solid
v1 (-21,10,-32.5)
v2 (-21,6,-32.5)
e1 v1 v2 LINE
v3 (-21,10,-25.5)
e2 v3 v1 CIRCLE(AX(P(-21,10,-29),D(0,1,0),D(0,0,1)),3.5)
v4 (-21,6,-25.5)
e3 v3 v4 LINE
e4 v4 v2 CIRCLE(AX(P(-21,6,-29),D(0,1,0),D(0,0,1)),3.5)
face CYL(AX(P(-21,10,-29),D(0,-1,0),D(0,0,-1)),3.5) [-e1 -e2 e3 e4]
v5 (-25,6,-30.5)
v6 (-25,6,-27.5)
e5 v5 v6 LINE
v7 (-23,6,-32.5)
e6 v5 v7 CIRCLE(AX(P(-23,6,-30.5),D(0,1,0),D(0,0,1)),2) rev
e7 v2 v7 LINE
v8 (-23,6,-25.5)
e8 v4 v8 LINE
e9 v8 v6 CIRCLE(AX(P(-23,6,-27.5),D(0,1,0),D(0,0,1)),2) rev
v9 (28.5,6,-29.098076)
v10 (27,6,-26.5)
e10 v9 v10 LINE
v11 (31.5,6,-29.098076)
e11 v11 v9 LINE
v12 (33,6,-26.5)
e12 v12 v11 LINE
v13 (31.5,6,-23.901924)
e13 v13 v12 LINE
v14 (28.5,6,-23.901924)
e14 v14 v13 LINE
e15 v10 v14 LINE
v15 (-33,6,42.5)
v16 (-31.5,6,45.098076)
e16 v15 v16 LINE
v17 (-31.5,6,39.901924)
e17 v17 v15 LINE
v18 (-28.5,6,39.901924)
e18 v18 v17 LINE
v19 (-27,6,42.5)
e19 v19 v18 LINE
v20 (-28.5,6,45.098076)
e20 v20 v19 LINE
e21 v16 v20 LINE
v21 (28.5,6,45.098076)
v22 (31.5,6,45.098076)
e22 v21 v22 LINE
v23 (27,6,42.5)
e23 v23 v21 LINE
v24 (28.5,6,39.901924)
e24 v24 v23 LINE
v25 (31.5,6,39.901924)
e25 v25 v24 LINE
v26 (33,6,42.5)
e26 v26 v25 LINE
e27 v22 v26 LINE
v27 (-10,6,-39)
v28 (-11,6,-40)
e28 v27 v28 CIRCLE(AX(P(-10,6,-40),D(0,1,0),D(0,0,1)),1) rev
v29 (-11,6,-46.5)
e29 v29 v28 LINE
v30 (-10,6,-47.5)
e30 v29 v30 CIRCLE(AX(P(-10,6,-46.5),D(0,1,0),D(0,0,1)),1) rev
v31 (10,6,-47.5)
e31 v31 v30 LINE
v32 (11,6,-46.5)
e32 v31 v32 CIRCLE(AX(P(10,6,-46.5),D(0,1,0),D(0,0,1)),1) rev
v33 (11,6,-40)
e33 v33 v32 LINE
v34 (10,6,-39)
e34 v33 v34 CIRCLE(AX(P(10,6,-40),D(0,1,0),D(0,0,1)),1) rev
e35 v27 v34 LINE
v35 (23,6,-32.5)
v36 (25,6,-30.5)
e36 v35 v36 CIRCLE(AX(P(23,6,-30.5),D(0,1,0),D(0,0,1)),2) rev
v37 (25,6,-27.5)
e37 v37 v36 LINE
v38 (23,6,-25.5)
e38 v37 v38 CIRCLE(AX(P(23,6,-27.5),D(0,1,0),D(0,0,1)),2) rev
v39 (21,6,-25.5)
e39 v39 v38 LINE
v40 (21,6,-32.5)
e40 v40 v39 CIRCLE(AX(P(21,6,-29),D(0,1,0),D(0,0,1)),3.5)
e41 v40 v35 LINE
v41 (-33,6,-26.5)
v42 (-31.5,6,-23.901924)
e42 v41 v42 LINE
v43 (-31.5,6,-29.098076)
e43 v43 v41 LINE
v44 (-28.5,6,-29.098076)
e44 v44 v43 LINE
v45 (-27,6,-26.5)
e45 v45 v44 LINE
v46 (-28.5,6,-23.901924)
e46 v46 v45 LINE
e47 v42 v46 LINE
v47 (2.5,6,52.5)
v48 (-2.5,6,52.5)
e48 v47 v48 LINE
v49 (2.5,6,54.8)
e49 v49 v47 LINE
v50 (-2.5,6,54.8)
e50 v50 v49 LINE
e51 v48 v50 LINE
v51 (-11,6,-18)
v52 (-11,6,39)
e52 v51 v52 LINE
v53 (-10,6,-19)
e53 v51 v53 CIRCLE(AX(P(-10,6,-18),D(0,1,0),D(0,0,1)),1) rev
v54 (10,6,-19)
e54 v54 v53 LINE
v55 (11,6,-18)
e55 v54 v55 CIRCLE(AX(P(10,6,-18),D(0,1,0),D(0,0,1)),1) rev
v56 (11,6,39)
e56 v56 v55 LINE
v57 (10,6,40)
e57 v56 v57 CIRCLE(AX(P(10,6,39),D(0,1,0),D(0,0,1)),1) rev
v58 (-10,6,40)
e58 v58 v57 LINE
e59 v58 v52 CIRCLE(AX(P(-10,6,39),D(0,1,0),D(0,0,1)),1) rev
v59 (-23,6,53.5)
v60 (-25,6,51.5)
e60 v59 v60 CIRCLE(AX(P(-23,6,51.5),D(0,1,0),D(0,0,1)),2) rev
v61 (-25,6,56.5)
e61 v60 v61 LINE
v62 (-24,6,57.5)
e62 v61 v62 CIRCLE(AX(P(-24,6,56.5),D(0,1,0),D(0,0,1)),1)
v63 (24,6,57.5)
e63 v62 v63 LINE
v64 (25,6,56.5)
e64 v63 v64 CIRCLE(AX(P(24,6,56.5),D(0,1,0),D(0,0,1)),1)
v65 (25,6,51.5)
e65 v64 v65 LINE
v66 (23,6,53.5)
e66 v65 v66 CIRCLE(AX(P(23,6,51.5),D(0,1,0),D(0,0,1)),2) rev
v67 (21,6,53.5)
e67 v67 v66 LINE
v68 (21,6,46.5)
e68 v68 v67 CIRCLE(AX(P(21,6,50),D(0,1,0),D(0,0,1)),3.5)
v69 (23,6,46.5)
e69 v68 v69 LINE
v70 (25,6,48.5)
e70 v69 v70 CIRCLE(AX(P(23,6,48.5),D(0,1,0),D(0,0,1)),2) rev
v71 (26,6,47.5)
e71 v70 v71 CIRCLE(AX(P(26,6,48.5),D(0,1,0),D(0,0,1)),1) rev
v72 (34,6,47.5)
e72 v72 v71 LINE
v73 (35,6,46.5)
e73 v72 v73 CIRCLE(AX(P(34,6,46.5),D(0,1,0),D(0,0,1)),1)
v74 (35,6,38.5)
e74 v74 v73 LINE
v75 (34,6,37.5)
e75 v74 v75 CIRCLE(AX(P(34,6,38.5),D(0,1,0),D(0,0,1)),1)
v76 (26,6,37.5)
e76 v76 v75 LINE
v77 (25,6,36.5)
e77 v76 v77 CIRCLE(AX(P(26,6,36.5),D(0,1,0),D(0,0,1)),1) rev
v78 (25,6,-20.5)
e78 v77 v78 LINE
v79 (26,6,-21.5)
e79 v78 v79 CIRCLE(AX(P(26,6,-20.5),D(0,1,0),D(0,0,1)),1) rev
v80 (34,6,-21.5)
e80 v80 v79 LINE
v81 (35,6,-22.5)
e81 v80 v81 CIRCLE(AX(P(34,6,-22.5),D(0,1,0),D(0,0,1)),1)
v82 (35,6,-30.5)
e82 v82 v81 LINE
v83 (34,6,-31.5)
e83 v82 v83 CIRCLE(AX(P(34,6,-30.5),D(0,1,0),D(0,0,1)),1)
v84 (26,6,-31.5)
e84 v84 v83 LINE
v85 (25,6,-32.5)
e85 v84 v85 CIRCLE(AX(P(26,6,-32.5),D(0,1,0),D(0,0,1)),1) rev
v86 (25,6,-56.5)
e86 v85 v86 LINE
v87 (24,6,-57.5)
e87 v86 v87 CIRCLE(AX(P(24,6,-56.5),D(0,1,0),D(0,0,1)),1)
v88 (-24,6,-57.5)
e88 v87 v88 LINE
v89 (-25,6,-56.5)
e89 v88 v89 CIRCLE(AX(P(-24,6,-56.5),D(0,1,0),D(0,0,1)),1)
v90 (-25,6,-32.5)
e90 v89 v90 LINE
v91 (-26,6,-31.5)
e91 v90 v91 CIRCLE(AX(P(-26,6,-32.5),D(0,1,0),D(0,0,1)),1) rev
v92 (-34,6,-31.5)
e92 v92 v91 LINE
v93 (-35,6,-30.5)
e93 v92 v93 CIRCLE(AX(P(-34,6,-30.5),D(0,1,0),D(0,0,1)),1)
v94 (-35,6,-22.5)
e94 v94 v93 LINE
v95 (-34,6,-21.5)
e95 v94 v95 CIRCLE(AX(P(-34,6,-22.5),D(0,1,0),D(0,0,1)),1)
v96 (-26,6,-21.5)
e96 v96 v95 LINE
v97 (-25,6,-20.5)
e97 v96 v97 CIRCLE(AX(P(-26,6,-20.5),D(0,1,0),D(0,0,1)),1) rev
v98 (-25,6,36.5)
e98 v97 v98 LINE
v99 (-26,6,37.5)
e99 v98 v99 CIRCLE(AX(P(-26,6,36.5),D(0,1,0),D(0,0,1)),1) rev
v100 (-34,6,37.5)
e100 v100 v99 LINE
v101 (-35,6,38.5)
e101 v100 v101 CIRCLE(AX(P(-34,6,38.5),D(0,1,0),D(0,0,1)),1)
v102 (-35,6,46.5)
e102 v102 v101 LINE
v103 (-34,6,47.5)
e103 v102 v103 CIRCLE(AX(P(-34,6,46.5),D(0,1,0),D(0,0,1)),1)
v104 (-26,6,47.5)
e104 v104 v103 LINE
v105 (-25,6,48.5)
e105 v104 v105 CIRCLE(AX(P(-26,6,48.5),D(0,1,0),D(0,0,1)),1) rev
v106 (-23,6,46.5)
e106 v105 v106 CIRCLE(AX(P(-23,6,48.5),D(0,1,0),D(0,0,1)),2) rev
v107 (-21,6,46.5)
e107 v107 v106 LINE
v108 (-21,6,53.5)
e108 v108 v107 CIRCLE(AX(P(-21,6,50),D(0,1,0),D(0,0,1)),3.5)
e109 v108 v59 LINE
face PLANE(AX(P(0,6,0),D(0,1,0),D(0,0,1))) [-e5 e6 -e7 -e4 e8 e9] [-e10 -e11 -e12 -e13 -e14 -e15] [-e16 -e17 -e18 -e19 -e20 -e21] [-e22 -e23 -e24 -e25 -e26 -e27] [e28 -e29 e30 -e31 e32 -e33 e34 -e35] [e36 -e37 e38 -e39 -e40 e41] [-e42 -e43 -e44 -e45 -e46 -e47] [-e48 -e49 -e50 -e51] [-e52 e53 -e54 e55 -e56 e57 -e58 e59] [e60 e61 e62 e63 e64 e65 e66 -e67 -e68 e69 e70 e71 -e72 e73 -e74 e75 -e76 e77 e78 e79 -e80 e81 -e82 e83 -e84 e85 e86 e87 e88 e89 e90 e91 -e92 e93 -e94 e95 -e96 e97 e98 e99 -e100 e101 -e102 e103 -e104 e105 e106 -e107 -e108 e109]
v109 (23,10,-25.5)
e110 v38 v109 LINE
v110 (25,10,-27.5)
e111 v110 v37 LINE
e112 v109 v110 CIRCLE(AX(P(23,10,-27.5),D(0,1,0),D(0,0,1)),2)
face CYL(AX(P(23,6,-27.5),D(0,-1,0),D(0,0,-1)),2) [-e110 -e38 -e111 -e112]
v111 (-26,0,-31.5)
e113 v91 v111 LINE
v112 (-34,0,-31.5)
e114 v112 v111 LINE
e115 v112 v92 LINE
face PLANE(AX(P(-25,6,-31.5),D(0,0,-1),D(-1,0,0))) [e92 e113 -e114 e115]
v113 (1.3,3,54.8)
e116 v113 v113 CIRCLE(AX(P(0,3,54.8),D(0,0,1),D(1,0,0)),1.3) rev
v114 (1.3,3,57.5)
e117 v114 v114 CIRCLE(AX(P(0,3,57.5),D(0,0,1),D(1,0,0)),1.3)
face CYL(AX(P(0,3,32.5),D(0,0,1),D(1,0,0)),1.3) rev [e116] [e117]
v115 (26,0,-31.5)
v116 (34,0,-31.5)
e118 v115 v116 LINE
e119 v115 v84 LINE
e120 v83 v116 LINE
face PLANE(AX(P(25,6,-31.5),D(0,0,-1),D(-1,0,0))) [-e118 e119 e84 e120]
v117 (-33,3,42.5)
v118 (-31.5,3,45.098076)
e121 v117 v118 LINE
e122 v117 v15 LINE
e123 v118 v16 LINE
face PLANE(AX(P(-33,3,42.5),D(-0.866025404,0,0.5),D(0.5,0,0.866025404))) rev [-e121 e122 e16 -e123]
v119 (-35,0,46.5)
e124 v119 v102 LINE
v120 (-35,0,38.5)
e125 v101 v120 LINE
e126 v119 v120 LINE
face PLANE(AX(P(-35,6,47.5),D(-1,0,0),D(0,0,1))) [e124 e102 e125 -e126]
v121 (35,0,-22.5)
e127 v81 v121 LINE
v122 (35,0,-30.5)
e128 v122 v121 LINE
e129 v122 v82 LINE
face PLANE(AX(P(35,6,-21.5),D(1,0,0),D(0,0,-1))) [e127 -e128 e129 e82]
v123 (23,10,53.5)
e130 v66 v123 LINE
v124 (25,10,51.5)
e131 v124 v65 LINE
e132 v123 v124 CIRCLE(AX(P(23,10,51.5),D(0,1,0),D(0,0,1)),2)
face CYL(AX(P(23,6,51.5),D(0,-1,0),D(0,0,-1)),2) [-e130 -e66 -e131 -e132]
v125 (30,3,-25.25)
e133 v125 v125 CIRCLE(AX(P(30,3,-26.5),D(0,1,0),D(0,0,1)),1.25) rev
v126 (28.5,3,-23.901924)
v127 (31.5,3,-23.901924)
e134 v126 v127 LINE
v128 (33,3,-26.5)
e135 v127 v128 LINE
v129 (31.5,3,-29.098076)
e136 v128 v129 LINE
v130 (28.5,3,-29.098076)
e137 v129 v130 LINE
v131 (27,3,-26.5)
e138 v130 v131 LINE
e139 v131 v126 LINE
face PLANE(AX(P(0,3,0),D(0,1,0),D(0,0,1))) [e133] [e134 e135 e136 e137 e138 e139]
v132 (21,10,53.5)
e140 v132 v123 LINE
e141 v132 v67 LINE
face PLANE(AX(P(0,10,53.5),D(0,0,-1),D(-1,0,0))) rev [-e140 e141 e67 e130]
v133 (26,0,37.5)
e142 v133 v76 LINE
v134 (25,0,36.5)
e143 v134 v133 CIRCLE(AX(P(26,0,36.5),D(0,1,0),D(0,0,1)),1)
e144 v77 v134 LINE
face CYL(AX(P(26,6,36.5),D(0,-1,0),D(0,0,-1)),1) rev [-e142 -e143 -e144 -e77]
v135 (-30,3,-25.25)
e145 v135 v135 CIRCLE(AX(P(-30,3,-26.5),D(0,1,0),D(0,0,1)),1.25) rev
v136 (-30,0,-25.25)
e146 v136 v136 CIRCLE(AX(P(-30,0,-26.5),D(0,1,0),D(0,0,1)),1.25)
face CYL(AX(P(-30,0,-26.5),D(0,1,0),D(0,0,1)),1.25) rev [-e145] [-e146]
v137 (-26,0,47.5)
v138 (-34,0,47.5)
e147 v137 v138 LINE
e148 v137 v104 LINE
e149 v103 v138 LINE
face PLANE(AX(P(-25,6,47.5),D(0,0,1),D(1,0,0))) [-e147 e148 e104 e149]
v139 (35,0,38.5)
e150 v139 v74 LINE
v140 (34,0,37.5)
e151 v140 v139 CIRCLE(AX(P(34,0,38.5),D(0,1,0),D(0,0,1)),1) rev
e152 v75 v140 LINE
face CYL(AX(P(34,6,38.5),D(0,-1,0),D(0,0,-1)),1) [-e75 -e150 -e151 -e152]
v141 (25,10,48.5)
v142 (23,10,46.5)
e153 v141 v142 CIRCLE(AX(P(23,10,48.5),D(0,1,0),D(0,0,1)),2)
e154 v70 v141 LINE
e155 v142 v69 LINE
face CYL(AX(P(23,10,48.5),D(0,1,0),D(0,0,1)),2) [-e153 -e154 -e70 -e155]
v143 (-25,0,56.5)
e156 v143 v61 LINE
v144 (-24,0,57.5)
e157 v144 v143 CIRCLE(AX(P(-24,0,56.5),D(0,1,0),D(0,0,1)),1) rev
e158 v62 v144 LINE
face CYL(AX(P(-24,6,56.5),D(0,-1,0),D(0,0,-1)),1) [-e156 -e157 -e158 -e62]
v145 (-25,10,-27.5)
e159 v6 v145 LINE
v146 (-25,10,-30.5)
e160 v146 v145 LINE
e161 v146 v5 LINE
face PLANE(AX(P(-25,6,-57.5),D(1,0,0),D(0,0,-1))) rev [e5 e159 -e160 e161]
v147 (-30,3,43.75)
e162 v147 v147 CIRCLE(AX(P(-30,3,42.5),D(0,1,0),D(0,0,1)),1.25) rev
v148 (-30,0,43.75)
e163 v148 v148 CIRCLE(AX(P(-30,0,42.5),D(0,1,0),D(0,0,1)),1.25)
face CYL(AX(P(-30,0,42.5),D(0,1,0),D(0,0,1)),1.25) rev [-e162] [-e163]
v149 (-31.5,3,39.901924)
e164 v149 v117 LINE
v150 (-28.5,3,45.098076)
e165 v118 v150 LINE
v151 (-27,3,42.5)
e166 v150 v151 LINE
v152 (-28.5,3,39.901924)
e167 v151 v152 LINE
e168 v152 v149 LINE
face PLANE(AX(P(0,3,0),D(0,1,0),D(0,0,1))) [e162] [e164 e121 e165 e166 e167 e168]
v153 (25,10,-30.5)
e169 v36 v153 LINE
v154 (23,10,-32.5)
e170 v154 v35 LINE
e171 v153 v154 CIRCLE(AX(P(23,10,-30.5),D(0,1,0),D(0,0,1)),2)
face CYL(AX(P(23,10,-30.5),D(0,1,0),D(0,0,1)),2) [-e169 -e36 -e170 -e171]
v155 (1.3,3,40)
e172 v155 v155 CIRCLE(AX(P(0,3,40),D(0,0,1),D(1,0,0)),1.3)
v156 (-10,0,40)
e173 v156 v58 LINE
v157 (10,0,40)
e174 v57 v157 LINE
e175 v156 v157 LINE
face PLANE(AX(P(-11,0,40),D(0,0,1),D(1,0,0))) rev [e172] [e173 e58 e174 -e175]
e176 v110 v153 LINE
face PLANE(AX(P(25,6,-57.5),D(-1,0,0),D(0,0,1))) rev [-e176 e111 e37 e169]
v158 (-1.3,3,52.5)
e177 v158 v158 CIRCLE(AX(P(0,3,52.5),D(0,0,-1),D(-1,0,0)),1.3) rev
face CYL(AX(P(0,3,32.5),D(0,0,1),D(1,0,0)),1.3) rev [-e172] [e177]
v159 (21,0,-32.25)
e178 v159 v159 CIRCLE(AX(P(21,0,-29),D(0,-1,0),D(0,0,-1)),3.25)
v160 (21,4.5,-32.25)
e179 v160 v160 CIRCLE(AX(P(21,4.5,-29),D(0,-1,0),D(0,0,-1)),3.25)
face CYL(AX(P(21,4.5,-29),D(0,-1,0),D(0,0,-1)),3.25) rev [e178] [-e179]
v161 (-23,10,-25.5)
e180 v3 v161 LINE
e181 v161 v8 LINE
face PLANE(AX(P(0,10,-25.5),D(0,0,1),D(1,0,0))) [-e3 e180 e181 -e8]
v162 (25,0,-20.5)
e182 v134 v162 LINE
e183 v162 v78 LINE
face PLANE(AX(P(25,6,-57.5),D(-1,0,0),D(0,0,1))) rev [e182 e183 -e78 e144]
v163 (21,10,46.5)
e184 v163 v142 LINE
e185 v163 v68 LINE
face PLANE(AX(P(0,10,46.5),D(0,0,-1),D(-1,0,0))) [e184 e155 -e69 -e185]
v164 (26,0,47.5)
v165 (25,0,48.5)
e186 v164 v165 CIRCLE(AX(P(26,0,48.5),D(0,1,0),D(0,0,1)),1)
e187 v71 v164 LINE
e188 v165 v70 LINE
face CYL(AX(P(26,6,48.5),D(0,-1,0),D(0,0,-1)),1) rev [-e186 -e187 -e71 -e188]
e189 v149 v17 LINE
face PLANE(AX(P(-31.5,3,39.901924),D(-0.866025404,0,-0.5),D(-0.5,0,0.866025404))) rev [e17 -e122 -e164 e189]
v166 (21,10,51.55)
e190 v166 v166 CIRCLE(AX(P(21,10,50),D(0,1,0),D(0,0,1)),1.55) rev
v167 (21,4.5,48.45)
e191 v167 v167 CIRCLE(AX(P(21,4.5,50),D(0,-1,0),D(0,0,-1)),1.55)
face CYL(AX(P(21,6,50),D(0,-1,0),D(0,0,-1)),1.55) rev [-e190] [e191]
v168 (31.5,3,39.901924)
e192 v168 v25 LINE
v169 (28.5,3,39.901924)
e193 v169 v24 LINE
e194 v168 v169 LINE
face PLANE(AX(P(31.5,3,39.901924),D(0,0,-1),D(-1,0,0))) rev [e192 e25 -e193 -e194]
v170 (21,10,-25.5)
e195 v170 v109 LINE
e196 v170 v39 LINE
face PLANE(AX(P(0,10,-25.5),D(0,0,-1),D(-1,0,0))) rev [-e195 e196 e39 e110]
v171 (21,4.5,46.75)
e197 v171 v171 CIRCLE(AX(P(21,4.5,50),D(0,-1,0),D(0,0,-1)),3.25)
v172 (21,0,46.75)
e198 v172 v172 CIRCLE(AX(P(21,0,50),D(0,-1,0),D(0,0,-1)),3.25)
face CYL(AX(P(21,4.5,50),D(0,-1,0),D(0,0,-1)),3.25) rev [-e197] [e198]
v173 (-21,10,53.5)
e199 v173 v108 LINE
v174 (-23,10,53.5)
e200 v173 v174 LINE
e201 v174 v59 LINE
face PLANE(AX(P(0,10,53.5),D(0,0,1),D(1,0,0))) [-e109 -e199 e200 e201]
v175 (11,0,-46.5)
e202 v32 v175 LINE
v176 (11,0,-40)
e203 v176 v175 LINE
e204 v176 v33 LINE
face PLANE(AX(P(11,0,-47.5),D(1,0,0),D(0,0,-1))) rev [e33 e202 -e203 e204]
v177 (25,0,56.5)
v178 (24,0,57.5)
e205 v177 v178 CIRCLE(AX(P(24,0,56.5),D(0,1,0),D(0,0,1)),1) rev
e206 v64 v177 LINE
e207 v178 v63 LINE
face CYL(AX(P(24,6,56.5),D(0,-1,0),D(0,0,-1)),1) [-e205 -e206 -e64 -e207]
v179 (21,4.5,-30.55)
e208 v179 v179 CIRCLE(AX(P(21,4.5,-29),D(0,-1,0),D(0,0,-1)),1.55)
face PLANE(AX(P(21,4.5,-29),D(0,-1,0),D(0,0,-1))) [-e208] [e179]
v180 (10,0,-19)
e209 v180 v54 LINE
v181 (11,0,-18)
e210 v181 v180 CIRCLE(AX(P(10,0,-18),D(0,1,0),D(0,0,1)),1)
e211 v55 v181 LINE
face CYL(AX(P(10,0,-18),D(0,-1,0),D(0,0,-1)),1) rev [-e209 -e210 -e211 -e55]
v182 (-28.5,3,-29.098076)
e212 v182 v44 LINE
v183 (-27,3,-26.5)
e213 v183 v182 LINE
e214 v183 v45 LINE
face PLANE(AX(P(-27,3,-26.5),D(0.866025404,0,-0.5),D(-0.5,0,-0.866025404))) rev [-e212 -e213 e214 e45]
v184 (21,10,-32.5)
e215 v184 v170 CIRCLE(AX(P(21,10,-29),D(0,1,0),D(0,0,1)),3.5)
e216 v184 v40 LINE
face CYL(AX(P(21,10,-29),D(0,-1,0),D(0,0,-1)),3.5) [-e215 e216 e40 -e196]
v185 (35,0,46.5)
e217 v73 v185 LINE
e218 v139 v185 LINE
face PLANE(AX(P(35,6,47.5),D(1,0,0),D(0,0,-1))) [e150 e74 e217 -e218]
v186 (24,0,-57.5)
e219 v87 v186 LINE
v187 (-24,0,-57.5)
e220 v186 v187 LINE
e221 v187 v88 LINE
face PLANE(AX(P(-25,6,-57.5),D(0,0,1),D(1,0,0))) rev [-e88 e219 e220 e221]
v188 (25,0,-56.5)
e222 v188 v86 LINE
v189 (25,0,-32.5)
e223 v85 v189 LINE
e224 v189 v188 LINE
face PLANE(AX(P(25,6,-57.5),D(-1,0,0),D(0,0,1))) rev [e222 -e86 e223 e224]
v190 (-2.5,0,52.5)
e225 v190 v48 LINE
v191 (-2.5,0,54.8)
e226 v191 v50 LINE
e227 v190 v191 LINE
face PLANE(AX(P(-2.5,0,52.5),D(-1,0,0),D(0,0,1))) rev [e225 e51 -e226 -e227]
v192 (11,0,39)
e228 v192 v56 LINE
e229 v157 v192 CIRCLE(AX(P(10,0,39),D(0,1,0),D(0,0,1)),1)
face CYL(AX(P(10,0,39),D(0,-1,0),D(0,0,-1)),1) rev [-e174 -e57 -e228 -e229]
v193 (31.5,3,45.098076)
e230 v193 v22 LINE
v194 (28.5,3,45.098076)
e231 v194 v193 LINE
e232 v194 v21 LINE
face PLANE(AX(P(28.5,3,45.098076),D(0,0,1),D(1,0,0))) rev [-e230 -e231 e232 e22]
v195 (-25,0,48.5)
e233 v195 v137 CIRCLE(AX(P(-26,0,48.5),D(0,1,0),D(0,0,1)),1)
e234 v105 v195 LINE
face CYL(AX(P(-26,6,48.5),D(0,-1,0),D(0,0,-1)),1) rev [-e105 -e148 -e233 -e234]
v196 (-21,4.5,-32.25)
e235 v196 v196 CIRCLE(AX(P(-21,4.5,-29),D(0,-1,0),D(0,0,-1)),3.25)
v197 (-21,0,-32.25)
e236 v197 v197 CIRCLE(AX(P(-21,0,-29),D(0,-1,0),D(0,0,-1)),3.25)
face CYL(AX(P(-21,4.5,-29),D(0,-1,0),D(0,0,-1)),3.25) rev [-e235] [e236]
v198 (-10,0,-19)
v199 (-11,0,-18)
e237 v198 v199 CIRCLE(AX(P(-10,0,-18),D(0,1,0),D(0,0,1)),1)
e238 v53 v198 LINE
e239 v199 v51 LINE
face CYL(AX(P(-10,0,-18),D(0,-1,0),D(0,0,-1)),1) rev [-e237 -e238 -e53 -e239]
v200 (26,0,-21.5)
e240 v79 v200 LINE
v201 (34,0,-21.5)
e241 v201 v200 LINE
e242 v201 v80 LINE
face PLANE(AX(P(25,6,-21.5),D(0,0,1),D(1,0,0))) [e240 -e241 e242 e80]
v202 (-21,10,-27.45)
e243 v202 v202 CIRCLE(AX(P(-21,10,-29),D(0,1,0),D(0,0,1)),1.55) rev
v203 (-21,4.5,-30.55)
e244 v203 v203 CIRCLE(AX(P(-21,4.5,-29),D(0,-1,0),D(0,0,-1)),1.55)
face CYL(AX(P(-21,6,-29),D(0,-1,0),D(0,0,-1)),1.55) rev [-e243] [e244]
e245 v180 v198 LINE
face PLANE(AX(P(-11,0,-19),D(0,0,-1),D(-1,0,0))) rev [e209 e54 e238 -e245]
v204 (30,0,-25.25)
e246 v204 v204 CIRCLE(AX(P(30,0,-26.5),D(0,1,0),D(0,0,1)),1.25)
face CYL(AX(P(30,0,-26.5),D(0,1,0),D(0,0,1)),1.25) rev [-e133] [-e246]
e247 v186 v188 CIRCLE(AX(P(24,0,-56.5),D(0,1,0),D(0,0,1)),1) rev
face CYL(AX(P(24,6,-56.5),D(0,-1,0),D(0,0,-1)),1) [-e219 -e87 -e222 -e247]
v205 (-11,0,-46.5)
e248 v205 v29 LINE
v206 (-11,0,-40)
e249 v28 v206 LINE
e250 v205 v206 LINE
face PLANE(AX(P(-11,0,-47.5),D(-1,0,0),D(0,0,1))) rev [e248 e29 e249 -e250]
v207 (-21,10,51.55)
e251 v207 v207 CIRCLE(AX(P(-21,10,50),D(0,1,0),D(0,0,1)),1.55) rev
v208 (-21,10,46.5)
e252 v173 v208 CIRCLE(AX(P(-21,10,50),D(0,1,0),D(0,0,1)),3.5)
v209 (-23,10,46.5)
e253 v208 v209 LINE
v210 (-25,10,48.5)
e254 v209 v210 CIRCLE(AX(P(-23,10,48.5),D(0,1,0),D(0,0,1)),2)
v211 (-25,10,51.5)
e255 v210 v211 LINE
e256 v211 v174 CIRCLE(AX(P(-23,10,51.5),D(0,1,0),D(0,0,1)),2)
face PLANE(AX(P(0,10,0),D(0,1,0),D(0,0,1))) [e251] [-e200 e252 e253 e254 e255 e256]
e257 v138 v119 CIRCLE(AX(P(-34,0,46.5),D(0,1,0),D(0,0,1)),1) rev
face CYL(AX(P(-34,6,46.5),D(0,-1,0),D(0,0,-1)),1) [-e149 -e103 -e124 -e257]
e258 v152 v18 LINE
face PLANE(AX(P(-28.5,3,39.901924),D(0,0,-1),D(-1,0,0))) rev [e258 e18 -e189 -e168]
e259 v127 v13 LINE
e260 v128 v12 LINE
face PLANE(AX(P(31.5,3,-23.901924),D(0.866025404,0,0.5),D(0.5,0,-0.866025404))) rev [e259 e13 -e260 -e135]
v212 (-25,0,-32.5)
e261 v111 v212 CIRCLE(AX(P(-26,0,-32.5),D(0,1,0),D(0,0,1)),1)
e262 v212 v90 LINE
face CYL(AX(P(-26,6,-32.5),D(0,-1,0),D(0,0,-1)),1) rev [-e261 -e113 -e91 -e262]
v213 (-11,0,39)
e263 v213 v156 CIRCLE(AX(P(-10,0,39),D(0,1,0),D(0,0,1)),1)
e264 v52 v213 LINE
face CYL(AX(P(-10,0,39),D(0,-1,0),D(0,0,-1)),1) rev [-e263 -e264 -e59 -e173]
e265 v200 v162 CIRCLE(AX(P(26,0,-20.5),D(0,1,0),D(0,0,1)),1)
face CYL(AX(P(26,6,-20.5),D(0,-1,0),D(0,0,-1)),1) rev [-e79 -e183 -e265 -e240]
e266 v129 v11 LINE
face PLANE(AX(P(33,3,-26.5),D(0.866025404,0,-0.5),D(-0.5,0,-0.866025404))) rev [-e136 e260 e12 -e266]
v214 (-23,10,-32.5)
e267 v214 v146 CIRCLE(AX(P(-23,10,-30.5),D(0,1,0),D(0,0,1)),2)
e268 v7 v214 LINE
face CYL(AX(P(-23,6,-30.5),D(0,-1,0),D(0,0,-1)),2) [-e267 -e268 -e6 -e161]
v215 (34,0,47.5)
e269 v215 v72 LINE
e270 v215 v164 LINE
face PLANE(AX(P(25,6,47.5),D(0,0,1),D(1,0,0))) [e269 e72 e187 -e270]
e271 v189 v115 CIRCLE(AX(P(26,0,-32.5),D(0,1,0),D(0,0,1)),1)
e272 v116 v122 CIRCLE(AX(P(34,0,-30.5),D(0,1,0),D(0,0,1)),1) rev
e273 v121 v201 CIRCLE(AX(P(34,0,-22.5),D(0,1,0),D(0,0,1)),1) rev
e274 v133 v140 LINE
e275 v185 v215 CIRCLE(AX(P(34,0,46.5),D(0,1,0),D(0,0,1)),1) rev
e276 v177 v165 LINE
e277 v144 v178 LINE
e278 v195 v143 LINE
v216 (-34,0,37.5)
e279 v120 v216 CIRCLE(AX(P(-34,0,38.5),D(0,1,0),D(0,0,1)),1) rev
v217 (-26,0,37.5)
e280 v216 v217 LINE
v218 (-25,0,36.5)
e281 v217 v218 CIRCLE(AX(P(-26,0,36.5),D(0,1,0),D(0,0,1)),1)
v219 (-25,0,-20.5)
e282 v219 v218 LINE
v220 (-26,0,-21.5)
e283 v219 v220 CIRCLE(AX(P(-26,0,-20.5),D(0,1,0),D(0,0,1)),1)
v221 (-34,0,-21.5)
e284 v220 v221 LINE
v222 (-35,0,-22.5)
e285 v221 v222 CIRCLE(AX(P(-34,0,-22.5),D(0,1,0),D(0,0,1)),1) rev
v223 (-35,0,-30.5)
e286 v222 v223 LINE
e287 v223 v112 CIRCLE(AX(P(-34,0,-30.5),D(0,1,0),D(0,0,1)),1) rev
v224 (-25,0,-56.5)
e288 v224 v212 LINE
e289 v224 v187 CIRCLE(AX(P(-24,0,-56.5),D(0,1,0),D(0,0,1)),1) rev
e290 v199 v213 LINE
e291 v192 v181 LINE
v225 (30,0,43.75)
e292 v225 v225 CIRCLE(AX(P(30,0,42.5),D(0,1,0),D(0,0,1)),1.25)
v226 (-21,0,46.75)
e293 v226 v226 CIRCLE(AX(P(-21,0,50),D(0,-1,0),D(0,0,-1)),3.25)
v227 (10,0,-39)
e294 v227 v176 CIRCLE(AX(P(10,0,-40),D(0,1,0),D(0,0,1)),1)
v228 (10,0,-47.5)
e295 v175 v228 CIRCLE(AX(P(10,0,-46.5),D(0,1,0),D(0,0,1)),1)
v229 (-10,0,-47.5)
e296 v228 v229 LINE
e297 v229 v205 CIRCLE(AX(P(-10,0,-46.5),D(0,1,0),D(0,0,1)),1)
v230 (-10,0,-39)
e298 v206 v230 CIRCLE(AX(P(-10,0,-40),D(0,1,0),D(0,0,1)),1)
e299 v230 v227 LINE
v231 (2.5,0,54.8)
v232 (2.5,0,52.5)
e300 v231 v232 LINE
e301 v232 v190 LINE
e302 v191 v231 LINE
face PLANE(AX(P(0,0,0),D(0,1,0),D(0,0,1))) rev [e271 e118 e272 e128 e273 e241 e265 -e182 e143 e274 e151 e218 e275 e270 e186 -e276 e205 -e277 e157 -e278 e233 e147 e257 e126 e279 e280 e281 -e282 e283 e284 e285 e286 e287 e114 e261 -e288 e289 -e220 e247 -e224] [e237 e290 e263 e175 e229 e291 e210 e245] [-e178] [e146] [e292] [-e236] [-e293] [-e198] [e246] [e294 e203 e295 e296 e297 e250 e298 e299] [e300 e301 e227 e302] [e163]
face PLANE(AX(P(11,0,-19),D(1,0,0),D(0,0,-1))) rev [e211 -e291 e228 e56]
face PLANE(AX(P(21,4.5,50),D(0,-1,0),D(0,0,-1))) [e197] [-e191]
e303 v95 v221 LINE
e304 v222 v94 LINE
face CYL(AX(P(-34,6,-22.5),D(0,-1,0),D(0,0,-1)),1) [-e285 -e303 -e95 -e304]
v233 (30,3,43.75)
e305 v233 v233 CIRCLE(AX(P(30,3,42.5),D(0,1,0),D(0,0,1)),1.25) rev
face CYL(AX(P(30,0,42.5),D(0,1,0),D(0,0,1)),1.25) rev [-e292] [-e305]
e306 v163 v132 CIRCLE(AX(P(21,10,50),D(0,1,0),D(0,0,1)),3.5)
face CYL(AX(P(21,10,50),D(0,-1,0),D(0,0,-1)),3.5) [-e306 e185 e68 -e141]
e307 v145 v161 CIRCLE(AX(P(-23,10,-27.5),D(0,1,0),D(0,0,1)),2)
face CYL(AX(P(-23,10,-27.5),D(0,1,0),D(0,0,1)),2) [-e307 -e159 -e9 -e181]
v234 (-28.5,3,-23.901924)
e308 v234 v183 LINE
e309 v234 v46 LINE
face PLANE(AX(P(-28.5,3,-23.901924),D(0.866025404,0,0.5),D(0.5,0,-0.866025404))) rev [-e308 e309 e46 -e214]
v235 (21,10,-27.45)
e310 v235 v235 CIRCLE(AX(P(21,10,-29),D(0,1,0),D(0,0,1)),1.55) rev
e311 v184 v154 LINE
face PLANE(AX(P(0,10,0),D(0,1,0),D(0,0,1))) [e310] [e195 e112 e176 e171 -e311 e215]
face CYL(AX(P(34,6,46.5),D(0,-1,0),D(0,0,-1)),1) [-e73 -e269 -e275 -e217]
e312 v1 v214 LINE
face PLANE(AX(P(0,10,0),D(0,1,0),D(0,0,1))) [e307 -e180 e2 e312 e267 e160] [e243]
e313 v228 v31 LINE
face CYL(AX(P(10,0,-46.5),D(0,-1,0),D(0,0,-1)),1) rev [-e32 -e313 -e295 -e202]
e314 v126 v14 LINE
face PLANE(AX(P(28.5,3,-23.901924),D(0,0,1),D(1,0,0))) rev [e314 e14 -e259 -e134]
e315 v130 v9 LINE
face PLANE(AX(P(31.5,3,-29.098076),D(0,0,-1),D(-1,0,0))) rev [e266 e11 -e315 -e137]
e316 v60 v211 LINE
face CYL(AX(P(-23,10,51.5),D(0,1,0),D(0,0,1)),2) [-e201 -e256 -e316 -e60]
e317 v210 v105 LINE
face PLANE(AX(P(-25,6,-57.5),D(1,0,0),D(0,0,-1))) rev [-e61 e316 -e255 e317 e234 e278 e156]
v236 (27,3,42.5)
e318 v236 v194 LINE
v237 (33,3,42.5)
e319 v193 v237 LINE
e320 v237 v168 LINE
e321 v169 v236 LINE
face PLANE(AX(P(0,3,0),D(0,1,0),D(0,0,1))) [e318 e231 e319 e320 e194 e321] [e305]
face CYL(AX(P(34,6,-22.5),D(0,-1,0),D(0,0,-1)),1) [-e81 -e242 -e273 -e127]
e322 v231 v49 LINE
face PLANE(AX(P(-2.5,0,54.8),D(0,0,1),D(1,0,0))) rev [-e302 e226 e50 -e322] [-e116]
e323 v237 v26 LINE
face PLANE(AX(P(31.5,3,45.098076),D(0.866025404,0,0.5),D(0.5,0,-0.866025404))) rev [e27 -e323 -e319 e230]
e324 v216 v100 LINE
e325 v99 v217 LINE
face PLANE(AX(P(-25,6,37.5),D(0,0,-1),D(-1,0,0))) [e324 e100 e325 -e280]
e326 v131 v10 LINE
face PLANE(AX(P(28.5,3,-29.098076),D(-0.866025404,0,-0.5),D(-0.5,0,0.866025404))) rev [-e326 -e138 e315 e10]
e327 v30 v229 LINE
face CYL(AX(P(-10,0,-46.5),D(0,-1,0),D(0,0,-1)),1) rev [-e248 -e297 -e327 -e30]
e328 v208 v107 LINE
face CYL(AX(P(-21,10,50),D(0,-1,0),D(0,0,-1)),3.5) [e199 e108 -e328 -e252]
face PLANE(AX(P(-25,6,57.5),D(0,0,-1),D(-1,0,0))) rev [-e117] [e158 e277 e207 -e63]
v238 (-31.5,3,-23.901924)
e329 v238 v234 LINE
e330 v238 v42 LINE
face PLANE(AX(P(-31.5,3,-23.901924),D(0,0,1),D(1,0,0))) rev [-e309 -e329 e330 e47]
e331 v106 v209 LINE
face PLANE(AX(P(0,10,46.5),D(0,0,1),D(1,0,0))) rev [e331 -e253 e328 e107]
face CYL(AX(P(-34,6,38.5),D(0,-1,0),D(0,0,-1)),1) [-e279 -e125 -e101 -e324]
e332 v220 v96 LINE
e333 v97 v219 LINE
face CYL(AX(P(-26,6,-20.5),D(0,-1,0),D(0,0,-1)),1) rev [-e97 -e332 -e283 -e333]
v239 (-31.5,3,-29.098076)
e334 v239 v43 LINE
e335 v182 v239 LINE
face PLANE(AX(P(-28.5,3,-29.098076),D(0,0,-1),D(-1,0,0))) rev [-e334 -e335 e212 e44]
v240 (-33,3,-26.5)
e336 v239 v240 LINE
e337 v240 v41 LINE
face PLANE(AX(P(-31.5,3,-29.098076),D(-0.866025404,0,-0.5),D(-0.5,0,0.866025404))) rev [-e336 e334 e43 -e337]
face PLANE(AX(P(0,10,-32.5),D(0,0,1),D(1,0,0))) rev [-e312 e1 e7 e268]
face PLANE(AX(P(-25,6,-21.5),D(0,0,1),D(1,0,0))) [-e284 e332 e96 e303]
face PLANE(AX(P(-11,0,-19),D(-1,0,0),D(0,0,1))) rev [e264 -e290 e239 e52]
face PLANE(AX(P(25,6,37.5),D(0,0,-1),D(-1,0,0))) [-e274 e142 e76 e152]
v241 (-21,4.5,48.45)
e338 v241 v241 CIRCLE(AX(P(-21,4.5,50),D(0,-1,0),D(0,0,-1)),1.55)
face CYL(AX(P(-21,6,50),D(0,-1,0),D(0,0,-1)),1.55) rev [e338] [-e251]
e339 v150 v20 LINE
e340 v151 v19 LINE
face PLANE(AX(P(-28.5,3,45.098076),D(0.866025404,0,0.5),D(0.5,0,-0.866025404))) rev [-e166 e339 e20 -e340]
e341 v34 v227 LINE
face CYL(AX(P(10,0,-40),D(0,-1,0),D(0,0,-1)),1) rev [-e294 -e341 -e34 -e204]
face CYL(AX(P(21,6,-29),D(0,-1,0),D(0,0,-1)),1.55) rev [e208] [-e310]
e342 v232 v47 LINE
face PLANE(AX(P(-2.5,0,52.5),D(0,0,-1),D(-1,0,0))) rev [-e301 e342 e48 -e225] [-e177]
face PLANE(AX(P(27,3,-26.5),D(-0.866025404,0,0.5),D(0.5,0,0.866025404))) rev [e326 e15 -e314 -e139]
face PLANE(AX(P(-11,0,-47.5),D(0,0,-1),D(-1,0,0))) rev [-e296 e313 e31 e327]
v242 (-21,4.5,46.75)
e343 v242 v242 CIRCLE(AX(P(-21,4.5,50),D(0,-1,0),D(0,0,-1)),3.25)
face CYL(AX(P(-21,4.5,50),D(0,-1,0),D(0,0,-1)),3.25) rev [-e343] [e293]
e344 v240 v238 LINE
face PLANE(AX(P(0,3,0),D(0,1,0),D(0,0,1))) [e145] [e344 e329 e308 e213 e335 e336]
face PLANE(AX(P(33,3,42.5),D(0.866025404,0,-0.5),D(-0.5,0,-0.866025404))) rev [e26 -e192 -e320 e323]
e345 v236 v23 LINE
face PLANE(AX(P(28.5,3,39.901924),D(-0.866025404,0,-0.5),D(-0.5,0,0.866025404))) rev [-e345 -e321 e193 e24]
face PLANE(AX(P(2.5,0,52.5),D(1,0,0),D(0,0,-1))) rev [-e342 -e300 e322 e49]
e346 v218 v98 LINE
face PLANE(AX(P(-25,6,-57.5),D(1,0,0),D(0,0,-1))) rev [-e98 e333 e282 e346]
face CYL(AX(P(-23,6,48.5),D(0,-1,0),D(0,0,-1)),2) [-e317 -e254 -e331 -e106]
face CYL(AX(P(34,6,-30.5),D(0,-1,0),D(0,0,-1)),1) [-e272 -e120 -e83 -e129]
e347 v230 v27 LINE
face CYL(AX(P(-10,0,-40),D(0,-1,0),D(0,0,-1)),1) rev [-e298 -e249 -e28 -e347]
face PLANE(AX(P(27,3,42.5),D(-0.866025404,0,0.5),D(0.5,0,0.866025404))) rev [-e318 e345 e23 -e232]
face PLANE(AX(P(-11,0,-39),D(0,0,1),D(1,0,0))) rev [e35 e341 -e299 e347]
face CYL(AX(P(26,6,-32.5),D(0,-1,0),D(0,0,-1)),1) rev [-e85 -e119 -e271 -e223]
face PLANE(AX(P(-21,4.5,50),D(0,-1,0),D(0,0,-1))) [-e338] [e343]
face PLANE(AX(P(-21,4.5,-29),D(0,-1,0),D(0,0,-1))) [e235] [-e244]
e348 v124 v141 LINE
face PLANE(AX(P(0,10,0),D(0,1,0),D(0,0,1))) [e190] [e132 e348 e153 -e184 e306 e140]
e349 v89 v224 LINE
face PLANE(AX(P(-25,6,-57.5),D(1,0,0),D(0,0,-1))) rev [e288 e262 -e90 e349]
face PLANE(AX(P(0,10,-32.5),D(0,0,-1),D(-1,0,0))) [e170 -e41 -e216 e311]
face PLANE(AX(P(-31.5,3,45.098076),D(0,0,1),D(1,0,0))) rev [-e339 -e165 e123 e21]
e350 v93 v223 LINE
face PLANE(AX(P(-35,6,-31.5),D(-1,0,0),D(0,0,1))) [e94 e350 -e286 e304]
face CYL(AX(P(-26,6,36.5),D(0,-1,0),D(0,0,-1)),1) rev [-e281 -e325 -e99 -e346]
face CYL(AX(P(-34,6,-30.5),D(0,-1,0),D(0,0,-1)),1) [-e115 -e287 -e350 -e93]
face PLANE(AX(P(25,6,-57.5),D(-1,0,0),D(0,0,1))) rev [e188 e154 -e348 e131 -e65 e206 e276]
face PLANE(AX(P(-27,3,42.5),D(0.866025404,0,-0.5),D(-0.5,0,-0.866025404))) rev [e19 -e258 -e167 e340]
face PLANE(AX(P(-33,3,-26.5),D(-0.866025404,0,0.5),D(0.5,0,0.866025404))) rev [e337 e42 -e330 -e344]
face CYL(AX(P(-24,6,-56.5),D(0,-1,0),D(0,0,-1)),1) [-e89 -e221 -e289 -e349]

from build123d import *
from build123d.topology import SkipClean

# Parameters (mm, degrees)
SKETCH1_W               = 50
SKETCH1_H               = 115
SKETCH1_R               = 1.55
BOSS_EXTRUDE1_DEPTH     = 6
SKETCH2_R               = 3.25
CUT_EXTRUDE1_DEPTH      = 4.5
BOSS_EXTRUDE2_DEPTH     = 4
SKETCH4_W               = 10
SKETCH4_H               = 10
BOSS_EXTRUDE3_DEPTH     = 6
SKETCH5_R               = 1.25
CUT_EXTRUDE2_DEPTH      = 6
CUT_EXTRUDE3_DEPTH      = 68.581432361
CUT_EXTRUDE3_DEPTH_BACK = 68.581432361
SKETCH6_W               = 22
SKETCH6_H               = 59
SKETCH6_H_2             = 8.5
SKETCH7_R               = 1.3
CUT_EXTRUDE4_DEPTH      = 25
CUT_EXTRUDE5_DEPTH      = 68.581432361
CUT_EXTRUDE5_DEPTH_BACK = 68.581432361
SKETCH8_W               = 5
SKETCH8_H               = 2.3
CUT_EXTRUDE6_DEPTH      = 3
FILLET1_R               = 1
FILLET2_START           = 6
FILLET2_DEPTH           = 5


with BuildPart() as part:
    # Sketch1 → Boss-Extrude1 (new body)
    with BuildSketch(Plane(origin=(0, 0, 0), x_dir=(1, 0, 0), z_dir=(0, 1, 0))):
        Rectangle(SKETCH1_W, SKETCH1_H)
        with Locations(Location((-21, 29, 0), (0, 0, 270))):
            Circle(SKETCH1_R, mode=Mode.SUBTRACT)
        with Locations(Location((21, 29, 0), (0, 0, 270))):
            Circle(SKETCH1_R, mode=Mode.SUBTRACT)
        with Locations(Location((21, -50, 0), (0, 0, 270))):
            Circle(SKETCH1_R, mode=Mode.SUBTRACT)
        with Locations(Location((-21, -50, 0), (0, 0, 270))):
            Circle(SKETCH1_R, mode=Mode.SUBTRACT)
    extrude(amount=BOSS_EXTRUDE1_DEPTH)

    # Sketch2 → Cut-Extrude1 (cut)
    with BuildSketch(Plane.XZ):
        with Locations(Location((-21, 50, 0), (0, 0, 270))):
            Circle(SKETCH2_R)
        with Locations(Location((21, 50, 0), (0, 0, 270))):
            Circle(SKETCH2_R)
        with Locations(Location((21, -29, 0), (0, 0, 270))):
            Circle(SKETCH2_R)
        with Locations(Location((-21, -29, 0), (0, 0, 270))):
            Circle(SKETCH2_R)
    extrude(amount=-CUT_EXTRUDE1_DEPTH, mode=Mode.SUBTRACT)

    # Sketch3 → Boss-Extrude2 (add)
    with SkipClean():  # the faces are left unmerged after this step: merging them gives an invalid solid
        with BuildSketch(Plane(origin=(0, 6, 0), x_dir=(1, 0, 0), z_dir=(0, 1, 0))):
            with BuildLine():
                ThreePointArc((-21, 25.5), (-24.5, 29), (-21, 32.5))
                Line((-21, 32.5), (-25, 32.5))
                Line((-25, 32.5), (-25, 25.5))
                Line((-25, 25.5), (-21, 25.5))
            make_face()
            with BuildLine():
                ThreePointArc((-17.5, 29), (-18.525126266, 31.474873734), (-21, 32.5))
                Line((-21, 32.5), (-21, 30.55))
                ThreePointArc((-21, 30.55), (-19.903984489, 30.096015511), (-19.45, 29))
                ThreePointArc((-19.45, 29), (-19.903984489, 27.903984489), (-21, 27.45))
                Line((-21, 27.45), (-21, 25.5))
                ThreePointArc((-21, 25.5), (-18.525126266, 26.525126266), (-17.5, 29))
            make_face()
            with BuildLine():
                Line((-21, 30.55), (-21, 32.5))
                ThreePointArc((-21, 32.5), (-24.5, 29), (-21, 25.5))
                Line((-21, 25.5), (-21, 27.45))
                ThreePointArc((-21, 27.45), (-22.55, 29), (-21, 30.55))
            make_face()
            with BuildLine():
                ThreePointArc((24.5, 29), (23.474873734, 31.474873734), (21, 32.5))
                Line((21, 32.5), (21, 30.55))
                ThreePointArc((21, 30.55), (22.096015511, 30.096015511), (22.55, 29))
                ThreePointArc((22.55, 29), (22.096015511, 27.903984489), (21, 27.45))
                Line((21, 27.45), (21, 25.5))
                ThreePointArc((21, 25.5), (23.474873734, 26.525126266), (24.5, 29))
            make_face()
            with BuildLine():
                Line((21, 30.55), (21, 32.5))
                ThreePointArc((21, 32.5), (17.5, 29), (21, 25.5))
                Line((21, 25.5), (21, 27.45))
                ThreePointArc((21, 27.45), (19.45, 29), (21, 30.55))
            make_face()
            with BuildLine():
                Line((25, 32.5), (21, 32.5))
                ThreePointArc((21, 32.5), (23.474873734, 31.474873734), (24.5, 29))
                ThreePointArc((24.5, 29), (23.474873734, 26.525126266), (21, 25.5))
                Line((21, 25.5), (25, 25.5))
                Line((25, 25.5), (25, 32.5))
            make_face()
            with BuildLine():
                Line((25, -53.5), (25, -46.5))
                Line((25, -46.5), (21, -46.5))
                ThreePointArc((21, -46.5), (23.474873734, -47.525126266), (24.5, -50))
                ThreePointArc((24.5, -50), (23.474873734, -52.474873734), (21, -53.5))
                Line((21, -53.5), (25, -53.5))
            make_face()
            with BuildLine():
                ThreePointArc((24.5, -50), (23.474873734, -47.525126266), (21, -46.5))
                Line((21, -46.5), (21, -48.45))
                ThreePointArc((21, -48.45), (22.096015511, -48.903984489), (22.55, -50))
                ThreePointArc((22.55, -50), (22.096015511, -51.096015511), (21, -51.55))
                Line((21, -51.55), (21, -53.5))
                ThreePointArc((21, -53.5), (23.474873734, -52.474873734), (24.5, -50))
            make_face()
            with BuildLine():
                Line((21, -48.45), (21, -46.5))
                ThreePointArc((21, -46.5), (17.5, -50), (21, -53.5))
                Line((21, -53.5), (21, -51.55))
                ThreePointArc((21, -51.55), (19.45, -50), (21, -48.45))
            make_face()
            with BuildLine():
                ThreePointArc((-17.5, -50), (-18.525126266, -47.525126266), (-21, -46.5))
                Line((-21, -46.5), (-21, -48.45))
                ThreePointArc((-21, -48.45), (-19.903984489, -48.903984489), (-19.45, -50))
                ThreePointArc((-19.45, -50), (-19.903984489, -51.096015511), (-21, -51.55))
                Line((-21, -51.55), (-21, -53.5))
                ThreePointArc((-21, -53.5), (-18.525126266, -52.474873734), (-17.5, -50))
            make_face()
            with BuildLine():
                Line((-21, -48.45), (-21, -46.5))
                ThreePointArc((-21, -46.5), (-24.5, -50), (-21, -53.5))
                Line((-21, -53.5), (-21, -51.55))
                ThreePointArc((-21, -51.55), (-22.55, -50), (-21, -48.45))
            make_face()
            with BuildLine():
                Line((-21, -46.5), (-25, -46.5))
                Line((-25, -46.5), (-25, -53.5))
                Line((-25, -53.5), (-21, -53.5))
                ThreePointArc((-21, -53.5), (-24.5, -50), (-21, -46.5))
            make_face()
        extrude(amount=BOSS_EXTRUDE2_DEPTH)

    # Sketch4 → Boss-Extrude3 (add)
    with SkipClean():  # the faces are left unmerged after this step: merging them gives an invalid solid
        with BuildSketch(Plane.XZ):
            with Locations((-30, 42.5)):
                Rectangle(SKETCH4_W, SKETCH4_H)
            with Locations((-30, -26.5)):
                Rectangle(SKETCH4_W, SKETCH4_H)
            with Locations((30, -26.5)):
                Rectangle(SKETCH4_W, SKETCH4_H)
            with Locations((30, 42.5)):
                Rectangle(SKETCH4_W, SKETCH4_H)
        extrude(amount=-BOSS_EXTRUDE3_DEPTH)

    # Sketch5 → Cut-Extrude2 (cut)
    with SkipClean():  # the faces are left unmerged after this step: merging them gives an invalid solid
        with BuildSketch(Plane(origin=(0, 6, 0), x_dir=(1, 0, 0), z_dir=(0, 1, 0))):
            with Locations(Location((-30, 26.5, 0), (0, 0, 270))):
                Circle(SKETCH5_R)
            with Locations(Location((30, 26.5, 0), (0, 0, 270))):
                Circle(SKETCH5_R)
            with Locations(Location((30, -42.5, 0), (0, 0, 270))):
                Circle(SKETCH5_R)
            with Locations(Location((-30, -42.5, 0), (0, 0, 270))):
                Circle(SKETCH5_R)
        extrude(amount=-CUT_EXTRUDE2_DEPTH, mode=Mode.SUBTRACT)

    # Sketch6 → Cut-Extrude3 (cut, two sides: drawn at the far end of the back side and taken through both)
    with SkipClean():  # the faces are left unmerged after this step: merging them gives an invalid solid
        with BuildSketch(Plane(origin=(0, 6, 0), x_dir=(1, 0, 0), z_dir=(0, 1, 0)).offset(-CUT_EXTRUDE3_DEPTH_BACK)):
            with Locations((0, -10.5)):
                Rectangle(SKETCH6_W, SKETCH6_H)
            with Locations((0, 43.25)):
                Rectangle(SKETCH6_W, SKETCH6_H_2)
        extrude(amount=CUT_EXTRUDE3_DEPTH + CUT_EXTRUDE3_DEPTH_BACK, mode=Mode.SUBTRACT)

    # Sketch7 → Cut-Extrude4 (cut)
    with SkipClean():  # the faces are left unmerged after this step: merging them gives an invalid solid
        with BuildSketch(Plane.XY.offset(57.5)):
            with Locations((0, 3)):
                Circle(SKETCH7_R)
        extrude(amount=-CUT_EXTRUDE4_DEPTH, mode=Mode.SUBTRACT)

    # Sketch8 → Cut-Extrude5 (cut, two sides: drawn at the far end of the back side and taken through both)
    with SkipClean():  # the faces are left unmerged after this step: merging them gives an invalid solid
        with BuildSketch(Plane(origin=(0, 6, 0), x_dir=(1, 0, 0), z_dir=(0, 1, 0)).offset(-CUT_EXTRUDE5_DEPTH_BACK)):
            with Locations((0, -53.65)):
                Rectangle(SKETCH8_W, SKETCH8_H)
        extrude(amount=CUT_EXTRUDE5_DEPTH + CUT_EXTRUDE5_DEPTH_BACK, mode=Mode.SUBTRACT)

    # Sketch9 → Cut-Extrude6 (cut)
    with SkipClean():  # the faces are left unmerged after this step: merging them gives an invalid solid
        with BuildSketch(Plane(origin=(0, 6, 0), x_dir=(1, 0, 0), z_dir=(0, 1, 0))):
            Polygon((-27, 26.5), (-28.5, 29.098076211), (-31.5, 29.098076211), (-33, 26.5), (-31.5, 23.901923789), (-28.5, 23.901923789), align=None)
            Polygon((33, 26.5), (31.5, 29.098076211), (28.5, 29.098076211), (27, 26.5), (28.5, 23.901923789), (31.5, 23.901923789), align=None)
            Polygon((33, -42.5), (31.5, -39.901923789), (28.5, -39.901923789), (27, -42.5), (28.5, -45.098076211), (31.5, -45.098076211), align=None)
            Polygon((-27, -42.5), (-28.5, -39.901923789), (-31.5, -39.901923789), (-33, -42.5), (-31.5, -45.098076211), (-28.5, -45.098076211), align=None)
        extrude(amount=-CUT_EXTRUDE6_DEPTH, mode=Mode.SUBTRACT)

    # Fillet1
    # the kernel refuses this fillet: 1 mm, written as the material it adds along each edge
    with BuildSketch(Plane(origin=(-25, 0, 47.5), x_dir=(0, 0, 1), z_dir=(0, 1, 0)), Plane(origin=(-25, 0, -21.5), x_dir=(0, 0, 1), z_dir=(0, 1, 0)), Plane(origin=(25, 0, -31.5), x_dir=(0, 0, -1), z_dir=(0, 1, 0)), Plane(origin=(25, 0, 37.5), x_dir=(0, 0, -1), z_dir=(0, 1, 0)), Plane(origin=(11, 6, -19), x_dir=(-1, 0, 0), z_dir=(0, -1, 0)), Plane(origin=(11, 6, 40), x_dir=(0, 0, -1), z_dir=(0, -1, 0)), Plane(origin=(-11, 0, 40), x_dir=(0, 0, -1), z_dir=(0, 1, 0)), Plane(origin=(-11, 0, -19), x_dir=(1, 0, 0), z_dir=(0, 1, 0)), Plane(origin=(11, 6, -47.5), x_dir=(-1, 0, 0), z_dir=(0, -1, 0)), Plane(origin=(11, 6, -39), x_dir=(0, 0, -1), z_dir=(0, -1, 0)), Plane(origin=(-11, 0, -39), x_dir=(0, 0, -1), z_dir=(0, 1, 0)), Plane(origin=(-11, 0, -47.5), x_dir=(1, 0, 0), z_dir=(0, 1, 0))) as fillet1_piece_1:
        with BuildLine():
            CenterArc((FILLET1_R, -FILLET1_R), FILLET1_R, 90, 90)
            Line((0, -FILLET1_R), (0, 0))
            Line((0, 0), (FILLET1_R, 0))
        make_face()
    extrude(amount=6)
    with BuildSketch(Plane(origin=(-25, 0, 37.5), x_dir=(0, 0, -1), z_dir=(0, 1, 0)), Plane(origin=(-25, 0, -31.5), x_dir=(0, 0, -1), z_dir=(0, 1, 0)), Plane(origin=(25, 0, -21.5), x_dir=(0, 0, 1), z_dir=(0, 1, 0)), Plane(origin=(25, 0, 47.5), x_dir=(0, 0, 1), z_dir=(0, 1, 0))) as fillet1_piece_2:
        with BuildLine():
            CenterArc((FILLET1_R, FILLET1_R), FILLET1_R, 180, 90)
            Line((0, FILLET1_R), (0, 0))
            Line((0, 0), (FILLET1_R, 0))
        make_face()
    extrude(amount=6)
    # the kernel refuses this fillet: 1 mm, written as the material it takes off along each edge
    with BuildSketch(Plane(origin=(-35, -2.5, 37.5), x_dir=(0, 0, 1), z_dir=(0, 1, 0)), Plane(origin=(-35, -2.5, 47.5), x_dir=(1, 0, 0), z_dir=(0, 1, 0)), Plane(origin=(35, -2.5, -31.5), x_dir=(-1, 0, 0), z_dir=(0, 1, 0)), Plane(origin=(25, -2.5, 57.5), x_dir=(0, 0, -1), z_dir=(0, 1, 0)), Plane(origin=(25, -2.5, -57.5), x_dir=(-1, 0, 0), z_dir=(0, 1, 0))) as fillet1_2_piece_1:
        with BuildLine():
            CenterArc((FILLET1_R, FILLET1_R), FILLET1_R, 180, 90)
            Line((0, FILLET1_R), (0, 0))
            Line((0, 0), (FILLET1_R, 0))
        make_face()
    extrude(amount=11, mode=Mode.SUBTRACT)
    with BuildSketch(Plane(origin=(-35, -2.5, -31.5), x_dir=(1, 0, 0), z_dir=(0, 1, 0)), Plane(origin=(-35, -2.5, -21.5), x_dir=(0, 0, -1), z_dir=(0, 1, 0)), Plane(origin=(35, -2.5, -21.5), x_dir=(-1, 0, 0), z_dir=(0, 1, 0)), Plane(origin=(35, -2.5, 47.5), x_dir=(-1, 0, 0), z_dir=(0, 1, 0)), Plane(origin=(35, -2.5, 37.5), x_dir=(0, 0, 1), z_dir=(0, 1, 0)), Plane(origin=(-25, -2.5, 57.5), x_dir=(0, 0, -1), z_dir=(0, 1, 0)), Plane(origin=(-25, -2.5, -57.5), x_dir=(1, 0, 0), z_dir=(0, 1, 0))) as fillet1_2_piece_2:
        with BuildLine():
            CenterArc((FILLET1_R, -FILLET1_R), FILLET1_R, 90, 90)
            Line((0, -FILLET1_R), (0, 0))
            Line((0, 0), (FILLET1_R, 0))
        make_face()
    extrude(amount=11, mode=Mode.SUBTRACT)

    # Fillet2: read off the stored shape, not the designer's step
    # Fillet2 outline → Fillet2 (cut)
    with BuildSketch(Plane(origin=(0, 0, 0), x_dir=(1, 0, 0), z_dir=(0, 1, 0)).offset(FILLET2_START)):
        with BuildLine():
            Line((25, 25.5), (25, 27.5))
            ThreePointArc((25, 27.5), (24.414213562, 26.085786438), (23, 25.5))
            Line((23, 25.5), (25, 25.5))
        make_face()
        with BuildLine():
            ThreePointArc((23, 32.5), (24.414213562, 31.914213562), (25, 30.5))
            Line((25, 30.5), (25, 32.5))
            Line((25, 32.5), (23, 32.5))
        make_face()
        with BuildLine():
            Line((25, -53.5), (25, -51.5))
            ThreePointArc((25, -51.5), (24.414213562, -52.914213562), (23, -53.5))
            Line((23, -53.5), (25, -53.5))
        make_face()
        with BuildLine():
            ThreePointArc((23, -46.5), (24.414213562, -47.085786438), (25, -48.5))
            Line((25, -48.5), (25, -46.5))
            Line((25, -46.5), (23, -46.5))
        make_face()
        with BuildLine():
            ThreePointArc((-23, -53.5), (-24.414213562, -52.914213562), (-25, -51.5))
            Line((-25, -51.5), (-25, -53.5))
            Line((-25, -53.5), (-23, -53.5))
        make_face()
        with BuildLine():
            Line((-25, -46.5), (-25, -48.5))
            ThreePointArc((-25, -48.5), (-24.414213562, -47.085786438), (-23, -46.5))
            Line((-23, -46.5), (-25, -46.5))
        make_face()
        with BuildLine():
            ThreePointArc((-23, 25.5), (-24.414213562, 26.085786438), (-25, 27.5))
            Line((-25, 27.5), (-25, 25.5))
            Line((-25, 25.5), (-23, 25.5))
        make_face()
        with BuildLine():
            Line((-25, 32.5), (-25, 30.5))
            ThreePointArc((-25, 30.5), (-24.414213562, 31.914213562), (-23, 32.5))
            Line((-23, 32.5), (-25, 32.5))
        make_face()
    extrude(amount=FILLET2_DEPTH, mode=Mode.SUBTRACT)


solid = part.part
